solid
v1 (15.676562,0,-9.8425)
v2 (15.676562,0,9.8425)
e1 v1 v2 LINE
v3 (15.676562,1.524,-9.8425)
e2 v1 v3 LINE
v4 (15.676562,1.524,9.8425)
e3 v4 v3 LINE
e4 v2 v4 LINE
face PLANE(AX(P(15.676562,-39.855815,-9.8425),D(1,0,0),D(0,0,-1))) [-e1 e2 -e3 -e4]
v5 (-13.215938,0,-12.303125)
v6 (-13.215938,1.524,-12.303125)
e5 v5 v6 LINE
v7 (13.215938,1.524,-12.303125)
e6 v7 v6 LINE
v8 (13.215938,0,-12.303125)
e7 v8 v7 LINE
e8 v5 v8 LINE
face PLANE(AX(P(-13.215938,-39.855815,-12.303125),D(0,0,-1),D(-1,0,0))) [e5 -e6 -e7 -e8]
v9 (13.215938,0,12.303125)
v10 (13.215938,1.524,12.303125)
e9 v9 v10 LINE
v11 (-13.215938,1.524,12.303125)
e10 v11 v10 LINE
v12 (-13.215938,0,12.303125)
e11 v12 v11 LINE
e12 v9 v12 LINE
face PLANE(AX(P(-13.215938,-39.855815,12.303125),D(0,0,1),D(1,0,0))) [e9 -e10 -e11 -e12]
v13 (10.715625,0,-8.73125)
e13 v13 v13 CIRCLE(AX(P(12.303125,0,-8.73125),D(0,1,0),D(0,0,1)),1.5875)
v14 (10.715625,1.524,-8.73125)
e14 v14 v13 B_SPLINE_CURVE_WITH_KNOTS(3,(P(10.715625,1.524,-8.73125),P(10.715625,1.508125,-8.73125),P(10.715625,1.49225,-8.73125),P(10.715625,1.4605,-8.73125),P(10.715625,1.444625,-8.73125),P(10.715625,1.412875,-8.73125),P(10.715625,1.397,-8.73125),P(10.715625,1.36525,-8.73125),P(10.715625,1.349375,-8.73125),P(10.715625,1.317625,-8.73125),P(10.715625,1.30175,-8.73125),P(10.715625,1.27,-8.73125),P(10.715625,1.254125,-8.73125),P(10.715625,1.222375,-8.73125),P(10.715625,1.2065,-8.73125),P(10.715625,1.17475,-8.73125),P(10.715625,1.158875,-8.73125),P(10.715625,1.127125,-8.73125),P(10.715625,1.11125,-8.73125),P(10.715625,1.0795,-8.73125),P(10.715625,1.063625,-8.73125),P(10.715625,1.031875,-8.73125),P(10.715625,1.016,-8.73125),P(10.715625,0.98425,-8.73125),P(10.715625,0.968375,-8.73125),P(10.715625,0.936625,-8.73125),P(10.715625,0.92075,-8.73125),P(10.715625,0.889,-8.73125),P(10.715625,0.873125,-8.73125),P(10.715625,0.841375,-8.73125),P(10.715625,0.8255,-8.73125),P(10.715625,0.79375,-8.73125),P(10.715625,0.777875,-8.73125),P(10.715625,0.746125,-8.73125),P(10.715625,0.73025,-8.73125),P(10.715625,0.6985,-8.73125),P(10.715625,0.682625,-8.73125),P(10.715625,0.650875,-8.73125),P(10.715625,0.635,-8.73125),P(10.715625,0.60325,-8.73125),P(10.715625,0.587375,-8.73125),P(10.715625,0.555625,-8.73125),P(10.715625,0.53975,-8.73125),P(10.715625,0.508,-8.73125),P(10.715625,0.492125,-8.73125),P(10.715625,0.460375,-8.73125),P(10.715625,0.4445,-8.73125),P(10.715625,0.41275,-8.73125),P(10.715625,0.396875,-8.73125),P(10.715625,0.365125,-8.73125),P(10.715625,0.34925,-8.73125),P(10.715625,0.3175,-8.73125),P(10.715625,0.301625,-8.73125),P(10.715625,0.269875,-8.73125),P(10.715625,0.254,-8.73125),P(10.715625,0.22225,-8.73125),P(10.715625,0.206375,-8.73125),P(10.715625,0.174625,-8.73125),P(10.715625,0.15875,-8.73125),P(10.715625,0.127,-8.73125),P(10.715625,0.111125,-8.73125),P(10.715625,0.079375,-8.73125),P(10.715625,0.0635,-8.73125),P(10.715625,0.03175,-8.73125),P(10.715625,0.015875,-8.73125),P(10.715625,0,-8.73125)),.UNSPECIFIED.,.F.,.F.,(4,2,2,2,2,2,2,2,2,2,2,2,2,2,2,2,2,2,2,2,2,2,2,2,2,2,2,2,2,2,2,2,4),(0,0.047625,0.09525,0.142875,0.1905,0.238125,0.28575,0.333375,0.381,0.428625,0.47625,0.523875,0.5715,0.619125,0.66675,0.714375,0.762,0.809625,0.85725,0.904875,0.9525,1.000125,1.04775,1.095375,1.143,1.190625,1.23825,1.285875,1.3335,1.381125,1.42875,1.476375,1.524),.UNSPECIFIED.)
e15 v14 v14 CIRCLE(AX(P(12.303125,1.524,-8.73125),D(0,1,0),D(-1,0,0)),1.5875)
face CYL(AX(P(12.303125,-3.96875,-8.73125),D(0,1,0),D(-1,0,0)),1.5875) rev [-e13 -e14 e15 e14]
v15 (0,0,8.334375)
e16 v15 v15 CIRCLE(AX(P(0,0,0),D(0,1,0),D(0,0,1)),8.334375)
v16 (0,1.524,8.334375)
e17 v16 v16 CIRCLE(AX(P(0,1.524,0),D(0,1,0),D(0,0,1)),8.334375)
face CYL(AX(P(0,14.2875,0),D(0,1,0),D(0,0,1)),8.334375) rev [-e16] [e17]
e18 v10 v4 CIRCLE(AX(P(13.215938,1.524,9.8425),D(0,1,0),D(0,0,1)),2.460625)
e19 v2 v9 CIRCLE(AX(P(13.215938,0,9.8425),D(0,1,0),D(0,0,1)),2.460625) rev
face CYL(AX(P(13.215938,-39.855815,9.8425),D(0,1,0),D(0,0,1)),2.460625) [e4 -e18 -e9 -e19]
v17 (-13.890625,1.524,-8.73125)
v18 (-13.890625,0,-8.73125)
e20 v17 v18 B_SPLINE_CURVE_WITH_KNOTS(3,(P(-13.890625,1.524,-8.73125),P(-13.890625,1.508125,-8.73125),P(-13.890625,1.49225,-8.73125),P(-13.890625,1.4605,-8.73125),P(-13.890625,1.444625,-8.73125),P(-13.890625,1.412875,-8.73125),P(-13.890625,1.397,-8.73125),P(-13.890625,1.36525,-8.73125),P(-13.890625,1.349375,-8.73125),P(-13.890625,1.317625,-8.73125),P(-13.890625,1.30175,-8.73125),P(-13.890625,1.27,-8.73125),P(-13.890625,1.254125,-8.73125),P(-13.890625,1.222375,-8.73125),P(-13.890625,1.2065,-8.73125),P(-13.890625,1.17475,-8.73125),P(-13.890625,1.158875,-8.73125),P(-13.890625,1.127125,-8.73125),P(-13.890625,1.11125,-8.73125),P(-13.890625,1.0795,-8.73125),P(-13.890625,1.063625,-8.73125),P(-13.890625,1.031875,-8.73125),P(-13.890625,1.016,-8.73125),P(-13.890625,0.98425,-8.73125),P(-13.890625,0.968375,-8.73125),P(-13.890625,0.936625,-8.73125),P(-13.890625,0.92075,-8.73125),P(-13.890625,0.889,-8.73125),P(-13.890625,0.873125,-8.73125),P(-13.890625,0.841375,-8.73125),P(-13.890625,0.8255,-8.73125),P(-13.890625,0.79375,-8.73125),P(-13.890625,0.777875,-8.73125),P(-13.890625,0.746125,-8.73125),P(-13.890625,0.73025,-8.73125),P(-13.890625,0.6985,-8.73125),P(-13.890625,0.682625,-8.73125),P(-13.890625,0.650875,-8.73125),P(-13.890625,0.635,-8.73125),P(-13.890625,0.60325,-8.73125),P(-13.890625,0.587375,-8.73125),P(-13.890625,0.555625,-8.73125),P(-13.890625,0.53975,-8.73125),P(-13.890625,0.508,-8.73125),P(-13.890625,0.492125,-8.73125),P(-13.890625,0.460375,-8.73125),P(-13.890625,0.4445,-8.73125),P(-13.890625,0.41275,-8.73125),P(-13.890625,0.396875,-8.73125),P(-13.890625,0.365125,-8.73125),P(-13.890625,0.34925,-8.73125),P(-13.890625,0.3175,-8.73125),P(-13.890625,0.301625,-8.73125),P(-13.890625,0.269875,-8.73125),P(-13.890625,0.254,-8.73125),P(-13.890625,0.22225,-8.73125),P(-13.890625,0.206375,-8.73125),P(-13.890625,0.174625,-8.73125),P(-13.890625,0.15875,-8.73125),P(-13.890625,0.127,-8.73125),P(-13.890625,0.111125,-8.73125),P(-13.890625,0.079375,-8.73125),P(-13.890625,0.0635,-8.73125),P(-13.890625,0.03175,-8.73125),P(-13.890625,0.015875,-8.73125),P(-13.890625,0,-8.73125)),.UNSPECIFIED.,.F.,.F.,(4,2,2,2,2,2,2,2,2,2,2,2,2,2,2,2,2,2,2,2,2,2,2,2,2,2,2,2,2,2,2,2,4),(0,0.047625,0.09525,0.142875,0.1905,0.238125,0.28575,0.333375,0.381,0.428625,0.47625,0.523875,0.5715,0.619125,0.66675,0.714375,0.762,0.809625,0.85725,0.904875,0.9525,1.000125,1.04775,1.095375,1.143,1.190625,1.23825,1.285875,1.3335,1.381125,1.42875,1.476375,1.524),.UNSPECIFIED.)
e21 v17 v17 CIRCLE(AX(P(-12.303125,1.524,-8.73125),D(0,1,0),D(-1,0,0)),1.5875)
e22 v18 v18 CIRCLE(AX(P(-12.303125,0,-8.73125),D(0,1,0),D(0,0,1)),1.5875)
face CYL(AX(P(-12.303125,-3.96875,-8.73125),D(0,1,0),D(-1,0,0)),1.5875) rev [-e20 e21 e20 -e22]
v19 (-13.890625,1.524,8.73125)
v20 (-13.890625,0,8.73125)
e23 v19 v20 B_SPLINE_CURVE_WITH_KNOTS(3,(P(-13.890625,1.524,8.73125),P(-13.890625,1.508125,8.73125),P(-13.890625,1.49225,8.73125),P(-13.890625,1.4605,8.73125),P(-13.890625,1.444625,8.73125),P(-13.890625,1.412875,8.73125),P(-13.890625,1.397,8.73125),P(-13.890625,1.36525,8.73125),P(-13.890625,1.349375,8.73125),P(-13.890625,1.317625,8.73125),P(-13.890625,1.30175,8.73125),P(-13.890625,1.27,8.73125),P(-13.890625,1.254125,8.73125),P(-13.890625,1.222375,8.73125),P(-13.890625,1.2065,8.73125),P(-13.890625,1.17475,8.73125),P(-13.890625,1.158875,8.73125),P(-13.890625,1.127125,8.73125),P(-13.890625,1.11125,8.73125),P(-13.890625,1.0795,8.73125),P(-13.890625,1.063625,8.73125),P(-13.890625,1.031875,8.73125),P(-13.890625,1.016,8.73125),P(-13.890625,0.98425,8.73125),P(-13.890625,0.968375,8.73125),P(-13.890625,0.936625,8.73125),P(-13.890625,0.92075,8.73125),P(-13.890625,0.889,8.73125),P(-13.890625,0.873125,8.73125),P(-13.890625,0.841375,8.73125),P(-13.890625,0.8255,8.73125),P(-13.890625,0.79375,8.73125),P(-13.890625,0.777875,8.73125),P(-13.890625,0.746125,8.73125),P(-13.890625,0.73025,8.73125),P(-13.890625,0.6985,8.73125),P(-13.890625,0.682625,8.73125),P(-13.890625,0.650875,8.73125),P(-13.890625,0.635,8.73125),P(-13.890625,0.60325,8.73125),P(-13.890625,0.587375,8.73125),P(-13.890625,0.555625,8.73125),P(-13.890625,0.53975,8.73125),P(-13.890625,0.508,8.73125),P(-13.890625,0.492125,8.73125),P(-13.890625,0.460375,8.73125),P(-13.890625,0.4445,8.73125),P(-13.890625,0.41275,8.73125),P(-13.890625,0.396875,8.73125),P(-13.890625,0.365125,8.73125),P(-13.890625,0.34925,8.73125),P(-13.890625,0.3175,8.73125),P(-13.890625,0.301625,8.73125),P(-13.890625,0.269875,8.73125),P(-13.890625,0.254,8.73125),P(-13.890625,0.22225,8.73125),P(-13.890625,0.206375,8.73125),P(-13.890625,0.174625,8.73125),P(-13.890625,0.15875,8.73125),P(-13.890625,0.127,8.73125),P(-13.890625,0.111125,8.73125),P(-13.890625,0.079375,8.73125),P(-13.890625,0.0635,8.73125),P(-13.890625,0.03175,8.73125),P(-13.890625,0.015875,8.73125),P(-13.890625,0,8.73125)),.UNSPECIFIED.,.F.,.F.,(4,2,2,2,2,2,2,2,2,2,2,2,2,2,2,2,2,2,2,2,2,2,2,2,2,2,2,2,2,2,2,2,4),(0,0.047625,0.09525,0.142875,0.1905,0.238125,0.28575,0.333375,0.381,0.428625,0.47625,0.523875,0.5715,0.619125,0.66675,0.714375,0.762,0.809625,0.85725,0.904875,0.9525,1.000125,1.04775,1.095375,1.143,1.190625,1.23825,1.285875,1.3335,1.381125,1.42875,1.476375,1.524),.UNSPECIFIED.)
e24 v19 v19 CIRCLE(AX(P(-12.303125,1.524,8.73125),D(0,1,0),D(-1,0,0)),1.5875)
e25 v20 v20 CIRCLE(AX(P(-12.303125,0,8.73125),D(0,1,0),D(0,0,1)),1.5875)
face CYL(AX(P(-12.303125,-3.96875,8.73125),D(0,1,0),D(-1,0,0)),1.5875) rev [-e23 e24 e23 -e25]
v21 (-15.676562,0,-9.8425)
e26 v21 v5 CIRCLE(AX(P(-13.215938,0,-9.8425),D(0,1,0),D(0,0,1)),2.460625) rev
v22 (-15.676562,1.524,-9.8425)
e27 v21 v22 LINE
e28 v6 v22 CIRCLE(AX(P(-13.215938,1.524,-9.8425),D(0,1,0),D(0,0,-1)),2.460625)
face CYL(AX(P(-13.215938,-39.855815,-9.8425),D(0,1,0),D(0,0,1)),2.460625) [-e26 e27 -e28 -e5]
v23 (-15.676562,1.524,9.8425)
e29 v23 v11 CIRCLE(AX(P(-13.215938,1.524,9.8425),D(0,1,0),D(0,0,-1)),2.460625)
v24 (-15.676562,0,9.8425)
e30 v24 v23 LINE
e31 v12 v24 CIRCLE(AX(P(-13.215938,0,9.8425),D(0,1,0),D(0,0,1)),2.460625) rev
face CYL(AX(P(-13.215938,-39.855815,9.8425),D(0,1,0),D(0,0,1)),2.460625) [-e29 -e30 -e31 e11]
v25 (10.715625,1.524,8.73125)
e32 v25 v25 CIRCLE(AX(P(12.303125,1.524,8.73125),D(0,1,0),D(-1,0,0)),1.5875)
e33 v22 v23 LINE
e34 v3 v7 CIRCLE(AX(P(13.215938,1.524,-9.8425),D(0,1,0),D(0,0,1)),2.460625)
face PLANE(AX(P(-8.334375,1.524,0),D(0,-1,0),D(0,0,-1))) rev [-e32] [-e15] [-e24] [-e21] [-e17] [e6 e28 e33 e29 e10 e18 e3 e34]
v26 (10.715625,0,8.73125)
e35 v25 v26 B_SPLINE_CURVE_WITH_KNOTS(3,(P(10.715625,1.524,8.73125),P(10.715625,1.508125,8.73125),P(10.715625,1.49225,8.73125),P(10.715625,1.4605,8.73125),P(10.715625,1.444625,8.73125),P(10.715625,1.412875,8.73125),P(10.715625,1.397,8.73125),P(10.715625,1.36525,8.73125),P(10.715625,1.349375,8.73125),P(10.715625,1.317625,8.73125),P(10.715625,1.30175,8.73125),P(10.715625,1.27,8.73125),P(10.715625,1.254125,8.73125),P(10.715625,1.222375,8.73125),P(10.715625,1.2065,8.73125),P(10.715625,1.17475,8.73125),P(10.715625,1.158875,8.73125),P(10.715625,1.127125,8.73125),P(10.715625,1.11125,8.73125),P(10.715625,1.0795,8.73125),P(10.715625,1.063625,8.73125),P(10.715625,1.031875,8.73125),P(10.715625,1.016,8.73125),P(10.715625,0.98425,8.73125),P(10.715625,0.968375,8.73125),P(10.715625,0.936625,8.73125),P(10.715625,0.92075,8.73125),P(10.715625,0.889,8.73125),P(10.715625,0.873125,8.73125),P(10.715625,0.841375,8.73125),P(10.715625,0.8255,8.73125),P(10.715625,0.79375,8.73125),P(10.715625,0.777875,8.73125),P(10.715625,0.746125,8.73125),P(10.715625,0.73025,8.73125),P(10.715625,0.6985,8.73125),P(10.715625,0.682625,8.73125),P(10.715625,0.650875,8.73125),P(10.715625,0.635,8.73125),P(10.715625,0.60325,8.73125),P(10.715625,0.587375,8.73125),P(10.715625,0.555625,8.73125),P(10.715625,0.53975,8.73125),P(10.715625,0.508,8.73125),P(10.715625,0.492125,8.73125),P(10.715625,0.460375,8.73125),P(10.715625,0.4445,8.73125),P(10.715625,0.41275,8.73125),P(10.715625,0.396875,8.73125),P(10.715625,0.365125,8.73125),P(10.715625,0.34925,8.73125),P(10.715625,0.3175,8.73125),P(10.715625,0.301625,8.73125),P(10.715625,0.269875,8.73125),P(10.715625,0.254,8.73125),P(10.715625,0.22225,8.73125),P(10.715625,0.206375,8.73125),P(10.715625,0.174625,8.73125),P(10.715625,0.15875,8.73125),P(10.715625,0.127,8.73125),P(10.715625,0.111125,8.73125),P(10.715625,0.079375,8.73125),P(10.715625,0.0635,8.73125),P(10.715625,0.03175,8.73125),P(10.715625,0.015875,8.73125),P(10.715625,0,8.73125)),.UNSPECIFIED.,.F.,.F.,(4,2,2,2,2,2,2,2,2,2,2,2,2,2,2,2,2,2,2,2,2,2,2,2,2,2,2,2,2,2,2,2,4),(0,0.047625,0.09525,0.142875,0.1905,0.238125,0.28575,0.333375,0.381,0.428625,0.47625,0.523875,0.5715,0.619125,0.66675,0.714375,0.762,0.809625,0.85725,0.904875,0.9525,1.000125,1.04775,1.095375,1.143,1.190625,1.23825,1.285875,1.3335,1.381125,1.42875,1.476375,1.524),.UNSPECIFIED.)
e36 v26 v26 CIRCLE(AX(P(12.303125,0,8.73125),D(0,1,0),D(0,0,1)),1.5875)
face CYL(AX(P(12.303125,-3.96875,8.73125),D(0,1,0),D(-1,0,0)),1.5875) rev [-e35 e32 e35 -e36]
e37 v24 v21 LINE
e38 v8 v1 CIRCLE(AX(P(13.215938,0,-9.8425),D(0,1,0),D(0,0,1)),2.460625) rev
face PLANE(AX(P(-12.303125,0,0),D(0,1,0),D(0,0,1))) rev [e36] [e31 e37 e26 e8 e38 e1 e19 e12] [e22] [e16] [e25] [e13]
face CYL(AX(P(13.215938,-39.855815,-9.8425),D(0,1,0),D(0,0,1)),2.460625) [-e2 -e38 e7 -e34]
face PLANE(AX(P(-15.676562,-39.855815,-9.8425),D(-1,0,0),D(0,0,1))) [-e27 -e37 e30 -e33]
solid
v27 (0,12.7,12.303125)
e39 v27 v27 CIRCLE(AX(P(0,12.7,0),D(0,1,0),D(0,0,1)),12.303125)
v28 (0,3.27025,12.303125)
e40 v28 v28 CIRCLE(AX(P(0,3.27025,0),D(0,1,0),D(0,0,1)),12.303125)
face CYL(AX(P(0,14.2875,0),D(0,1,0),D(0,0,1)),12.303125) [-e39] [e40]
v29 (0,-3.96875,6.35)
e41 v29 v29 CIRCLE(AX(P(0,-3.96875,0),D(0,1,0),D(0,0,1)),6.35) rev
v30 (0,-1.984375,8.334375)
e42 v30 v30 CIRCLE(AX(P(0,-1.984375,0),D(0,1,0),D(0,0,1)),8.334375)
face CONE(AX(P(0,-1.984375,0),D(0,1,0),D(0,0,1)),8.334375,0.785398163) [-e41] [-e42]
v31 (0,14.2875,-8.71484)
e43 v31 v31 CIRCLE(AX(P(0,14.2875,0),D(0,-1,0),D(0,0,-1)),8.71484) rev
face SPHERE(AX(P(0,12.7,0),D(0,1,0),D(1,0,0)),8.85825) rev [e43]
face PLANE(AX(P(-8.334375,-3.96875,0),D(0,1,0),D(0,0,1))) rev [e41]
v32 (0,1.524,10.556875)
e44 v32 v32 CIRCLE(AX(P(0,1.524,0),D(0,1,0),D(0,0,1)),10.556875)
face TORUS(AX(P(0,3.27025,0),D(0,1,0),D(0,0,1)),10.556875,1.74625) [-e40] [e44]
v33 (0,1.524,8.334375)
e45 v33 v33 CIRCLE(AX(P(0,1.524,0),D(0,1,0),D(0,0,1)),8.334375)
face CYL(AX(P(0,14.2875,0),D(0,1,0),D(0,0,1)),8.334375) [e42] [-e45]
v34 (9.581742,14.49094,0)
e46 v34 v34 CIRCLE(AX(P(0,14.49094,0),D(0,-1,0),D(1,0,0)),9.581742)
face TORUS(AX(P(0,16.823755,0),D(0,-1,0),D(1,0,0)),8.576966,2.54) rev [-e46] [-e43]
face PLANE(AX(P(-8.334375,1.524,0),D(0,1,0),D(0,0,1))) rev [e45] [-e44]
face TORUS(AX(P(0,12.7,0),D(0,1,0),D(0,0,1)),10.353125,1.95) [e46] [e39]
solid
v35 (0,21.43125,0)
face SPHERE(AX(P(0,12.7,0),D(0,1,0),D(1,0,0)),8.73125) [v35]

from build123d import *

# Parameters (mm, degrees)
SKETCH1_W           = 3.96875
SKETCH1_H           = 1.524
SKETCH9_R           = 8.334375
BOSS_EXTRUDE1_DEPTH = 1.524
SKETCH8_R           = 1.5875
CUT_EXTRUDE1_DEPTH  = 29.167713772
FILLET1_R           = 2.54
CHAMFER1_SIZE       = 1.984375


# Read off the part's stored shape, not the designer's step: Move Face1
with BuildPart() as part:
    # Sketch4 → Revolve3 (revolve)
    with BuildSketch(Plane.XY, mode=Mode.PRIVATE) as revolve3_sk:
        with BuildLine():
            Line((8.334375, 1.524), (10.556875, 1.524))
            ThreePointArc((10.556875, 1.524), (11.791660217, 2.035464783), (12.303125, 3.27025))
            Line((12.303125, 3.27025), (12.303125, 12.7))
            ThreePointArc((12.303125, 12.7), (11.245959863, 14.433593317), (9.220718975, 14.2875))
            Line((9.220718975, 14.2875), (0, 14.2875))
            Line((0, 14.2875), (0, -3.96875))
            Line((0, -3.96875), (8.334375, -3.96875))
            Line((8.334375, -3.96875), (8.334375, 1.524))
        make_face()
    revolve(revolve3_sk.sketch.rotate(Axis((0, 14.2875, 0), (0, -1, 0)), 90), axis=Axis((0, 14.2875, 0), (0, -1, 0)))

    # Sketch3<2> → Cut-Revolve1 (revolve, cut)
    with BuildSketch(Plane.XY):
        with BuildLine():
            Line((0, 21.43125), (0, 3.96875))
            ThreePointArc((0, 3.96875), (8.73125, 12.7), (0, 21.43125))
        make_face()
    revolve(axis=Axis((0, 21.43125, 0), (0, -1, 0)), mode=Mode.SUBTRACT)

    # Move Face1 outline → Move Face1 (revolve, cut)
    with BuildSketch(Plane.XY):
        with BuildLine():
            Line((0, 3.96875), (0, 3.84175))
            ThreePointArc((0, 3.84175), (6.801877131, 7.025225947), (8.714840032, 14.287500009))
            Line((8.714840032, 14.287500009), (8.585718973, 14.287500009))
            ThreePointArc((8.585718973, 14.287500009), (6.711765268, 7.115473739), (0, 3.96875))
        make_face()
    revolve(axis=Axis((0, 0, 0), (0, 1, 0)), mode=Mode.SUBTRACT)

    # Fillet1
    # the kernel refuses this fillet: 2.54 mm, written as the material it adds along each edge
    with BuildSketch(Plane(origin=(0, 14.2875, 0), x_dir=(0, 0, 1), z_dir=(1, 0, 0))) as fillet1_piece_1:
        with BuildLine():
            CenterArc((8.576965685, -2.536255253), FILLET1_R, 66.69777577, 20.19060902)
            Line((8.714840032, -9e-09), (9.220718975, 0))
            ThreePointArc((9.220718975, 0), (9.395810874, -0.111337644), (9.581741823, -0.203440449))
        make_face()
    revolve(axis=Axis((0, 14.2875, 0), (0, -1, 0)))

    # Chamfer1
    chamfer1_edges = [part.edges().sort_by_distance(p)[0] for p in [
        (0, -3.96875, -8.334375),
    ]]
    chamfer(chamfer1_edges, length=CHAMFER1_SIZE)


with BuildPart() as body_2:
    # Sketch1 → Revolve1 (revolve)
    with BuildSketch(Plane.XY, mode=Mode.PRIVATE) as revolve1_sk:
        with Locations((10.31875, 0.762)):
            Rectangle(SKETCH1_W, SKETCH1_H)
    revolve(revolve1_sk.sketch.rotate(Axis((0, 14.2875, 0), (0, -1, 0)), 90), axis=Axis((0, 14.2875, 0), (0, -1, 0)))

    # Sketch9 → Boss-Extrude1 (add)
    with BuildSketch(Plane(origin=(0, 1.524, 0), x_dir=(1, 0, 0), z_dir=(0, 1, 0))):
        with BuildLine():
            Line((-13.2159375, 12.303125), (13.2159375, 12.303125))
            ThreePointArc((13.2159375, 12.303125), (14.955862123, 11.582424623), (15.6765625, 9.8425))
            Line((15.6765625, 9.8425), (15.6765625, -9.8425))
            ThreePointArc((15.6765625, -9.8425), (14.955862123, -11.582424623), (13.2159375, -12.303125))
            Line((13.2159375, -12.303125), (-13.2159375, -12.303125))
            ThreePointArc((-13.2159375, -12.303125), (-14.955862123, -11.582424623), (-15.6765625, -9.8425))
            Line((-15.6765625, -9.8425), (-15.6765625, 9.8425))
            ThreePointArc((-15.6765625, 9.8425), (-14.955862123, 11.582424623), (-13.2159375, 12.303125))
        make_face()
        with Locations(Location((0, 0, 0), (0, 0, 270))):
            Circle(SKETCH9_R, mode=Mode.SUBTRACT)
    extrude(amount=-BOSS_EXTRUDE1_DEPTH)

    # Sketch8 → Cut-Extrude1 (cut, through all)
    with BuildSketch(Plane(origin=(0, 1.524, 0), x_dir=(1, 0, 0), z_dir=(0, 1, 0))):
        with Locations(Location((-12.303125, 8.73125, 0), (0, 0, 180))):
            Circle(SKETCH8_R)
        with Locations(Location((12.303125, -8.73125, 0), (0, 0, 180))):
            Circle(SKETCH8_R)
        with Locations(Location((12.303125, 8.73125, 0), (0, 0, 180))):
            Circle(SKETCH8_R)
        with Locations(Location((-12.303125, -8.73125, 0), (0, 0, 180))):
            Circle(SKETCH8_R)
    extrude(amount=-CUT_EXTRUDE1_DEPTH, mode=Mode.SUBTRACT)


with BuildPart() as body_3:
    # Sketch3 → Revolve2 (revolve)
    with BuildSketch(Plane.XY):
        with BuildLine():
            Line((0, 21.43125), (0, 3.96875))
            ThreePointArc((0, 3.96875), (8.73125, 12.7), (0, 21.43125))
        make_face()
    revolve(axis=Axis((0, 21.43125, 0), (0, -1, 0)))


solid = Compound([part.part, body_2.part, body_3.part])
